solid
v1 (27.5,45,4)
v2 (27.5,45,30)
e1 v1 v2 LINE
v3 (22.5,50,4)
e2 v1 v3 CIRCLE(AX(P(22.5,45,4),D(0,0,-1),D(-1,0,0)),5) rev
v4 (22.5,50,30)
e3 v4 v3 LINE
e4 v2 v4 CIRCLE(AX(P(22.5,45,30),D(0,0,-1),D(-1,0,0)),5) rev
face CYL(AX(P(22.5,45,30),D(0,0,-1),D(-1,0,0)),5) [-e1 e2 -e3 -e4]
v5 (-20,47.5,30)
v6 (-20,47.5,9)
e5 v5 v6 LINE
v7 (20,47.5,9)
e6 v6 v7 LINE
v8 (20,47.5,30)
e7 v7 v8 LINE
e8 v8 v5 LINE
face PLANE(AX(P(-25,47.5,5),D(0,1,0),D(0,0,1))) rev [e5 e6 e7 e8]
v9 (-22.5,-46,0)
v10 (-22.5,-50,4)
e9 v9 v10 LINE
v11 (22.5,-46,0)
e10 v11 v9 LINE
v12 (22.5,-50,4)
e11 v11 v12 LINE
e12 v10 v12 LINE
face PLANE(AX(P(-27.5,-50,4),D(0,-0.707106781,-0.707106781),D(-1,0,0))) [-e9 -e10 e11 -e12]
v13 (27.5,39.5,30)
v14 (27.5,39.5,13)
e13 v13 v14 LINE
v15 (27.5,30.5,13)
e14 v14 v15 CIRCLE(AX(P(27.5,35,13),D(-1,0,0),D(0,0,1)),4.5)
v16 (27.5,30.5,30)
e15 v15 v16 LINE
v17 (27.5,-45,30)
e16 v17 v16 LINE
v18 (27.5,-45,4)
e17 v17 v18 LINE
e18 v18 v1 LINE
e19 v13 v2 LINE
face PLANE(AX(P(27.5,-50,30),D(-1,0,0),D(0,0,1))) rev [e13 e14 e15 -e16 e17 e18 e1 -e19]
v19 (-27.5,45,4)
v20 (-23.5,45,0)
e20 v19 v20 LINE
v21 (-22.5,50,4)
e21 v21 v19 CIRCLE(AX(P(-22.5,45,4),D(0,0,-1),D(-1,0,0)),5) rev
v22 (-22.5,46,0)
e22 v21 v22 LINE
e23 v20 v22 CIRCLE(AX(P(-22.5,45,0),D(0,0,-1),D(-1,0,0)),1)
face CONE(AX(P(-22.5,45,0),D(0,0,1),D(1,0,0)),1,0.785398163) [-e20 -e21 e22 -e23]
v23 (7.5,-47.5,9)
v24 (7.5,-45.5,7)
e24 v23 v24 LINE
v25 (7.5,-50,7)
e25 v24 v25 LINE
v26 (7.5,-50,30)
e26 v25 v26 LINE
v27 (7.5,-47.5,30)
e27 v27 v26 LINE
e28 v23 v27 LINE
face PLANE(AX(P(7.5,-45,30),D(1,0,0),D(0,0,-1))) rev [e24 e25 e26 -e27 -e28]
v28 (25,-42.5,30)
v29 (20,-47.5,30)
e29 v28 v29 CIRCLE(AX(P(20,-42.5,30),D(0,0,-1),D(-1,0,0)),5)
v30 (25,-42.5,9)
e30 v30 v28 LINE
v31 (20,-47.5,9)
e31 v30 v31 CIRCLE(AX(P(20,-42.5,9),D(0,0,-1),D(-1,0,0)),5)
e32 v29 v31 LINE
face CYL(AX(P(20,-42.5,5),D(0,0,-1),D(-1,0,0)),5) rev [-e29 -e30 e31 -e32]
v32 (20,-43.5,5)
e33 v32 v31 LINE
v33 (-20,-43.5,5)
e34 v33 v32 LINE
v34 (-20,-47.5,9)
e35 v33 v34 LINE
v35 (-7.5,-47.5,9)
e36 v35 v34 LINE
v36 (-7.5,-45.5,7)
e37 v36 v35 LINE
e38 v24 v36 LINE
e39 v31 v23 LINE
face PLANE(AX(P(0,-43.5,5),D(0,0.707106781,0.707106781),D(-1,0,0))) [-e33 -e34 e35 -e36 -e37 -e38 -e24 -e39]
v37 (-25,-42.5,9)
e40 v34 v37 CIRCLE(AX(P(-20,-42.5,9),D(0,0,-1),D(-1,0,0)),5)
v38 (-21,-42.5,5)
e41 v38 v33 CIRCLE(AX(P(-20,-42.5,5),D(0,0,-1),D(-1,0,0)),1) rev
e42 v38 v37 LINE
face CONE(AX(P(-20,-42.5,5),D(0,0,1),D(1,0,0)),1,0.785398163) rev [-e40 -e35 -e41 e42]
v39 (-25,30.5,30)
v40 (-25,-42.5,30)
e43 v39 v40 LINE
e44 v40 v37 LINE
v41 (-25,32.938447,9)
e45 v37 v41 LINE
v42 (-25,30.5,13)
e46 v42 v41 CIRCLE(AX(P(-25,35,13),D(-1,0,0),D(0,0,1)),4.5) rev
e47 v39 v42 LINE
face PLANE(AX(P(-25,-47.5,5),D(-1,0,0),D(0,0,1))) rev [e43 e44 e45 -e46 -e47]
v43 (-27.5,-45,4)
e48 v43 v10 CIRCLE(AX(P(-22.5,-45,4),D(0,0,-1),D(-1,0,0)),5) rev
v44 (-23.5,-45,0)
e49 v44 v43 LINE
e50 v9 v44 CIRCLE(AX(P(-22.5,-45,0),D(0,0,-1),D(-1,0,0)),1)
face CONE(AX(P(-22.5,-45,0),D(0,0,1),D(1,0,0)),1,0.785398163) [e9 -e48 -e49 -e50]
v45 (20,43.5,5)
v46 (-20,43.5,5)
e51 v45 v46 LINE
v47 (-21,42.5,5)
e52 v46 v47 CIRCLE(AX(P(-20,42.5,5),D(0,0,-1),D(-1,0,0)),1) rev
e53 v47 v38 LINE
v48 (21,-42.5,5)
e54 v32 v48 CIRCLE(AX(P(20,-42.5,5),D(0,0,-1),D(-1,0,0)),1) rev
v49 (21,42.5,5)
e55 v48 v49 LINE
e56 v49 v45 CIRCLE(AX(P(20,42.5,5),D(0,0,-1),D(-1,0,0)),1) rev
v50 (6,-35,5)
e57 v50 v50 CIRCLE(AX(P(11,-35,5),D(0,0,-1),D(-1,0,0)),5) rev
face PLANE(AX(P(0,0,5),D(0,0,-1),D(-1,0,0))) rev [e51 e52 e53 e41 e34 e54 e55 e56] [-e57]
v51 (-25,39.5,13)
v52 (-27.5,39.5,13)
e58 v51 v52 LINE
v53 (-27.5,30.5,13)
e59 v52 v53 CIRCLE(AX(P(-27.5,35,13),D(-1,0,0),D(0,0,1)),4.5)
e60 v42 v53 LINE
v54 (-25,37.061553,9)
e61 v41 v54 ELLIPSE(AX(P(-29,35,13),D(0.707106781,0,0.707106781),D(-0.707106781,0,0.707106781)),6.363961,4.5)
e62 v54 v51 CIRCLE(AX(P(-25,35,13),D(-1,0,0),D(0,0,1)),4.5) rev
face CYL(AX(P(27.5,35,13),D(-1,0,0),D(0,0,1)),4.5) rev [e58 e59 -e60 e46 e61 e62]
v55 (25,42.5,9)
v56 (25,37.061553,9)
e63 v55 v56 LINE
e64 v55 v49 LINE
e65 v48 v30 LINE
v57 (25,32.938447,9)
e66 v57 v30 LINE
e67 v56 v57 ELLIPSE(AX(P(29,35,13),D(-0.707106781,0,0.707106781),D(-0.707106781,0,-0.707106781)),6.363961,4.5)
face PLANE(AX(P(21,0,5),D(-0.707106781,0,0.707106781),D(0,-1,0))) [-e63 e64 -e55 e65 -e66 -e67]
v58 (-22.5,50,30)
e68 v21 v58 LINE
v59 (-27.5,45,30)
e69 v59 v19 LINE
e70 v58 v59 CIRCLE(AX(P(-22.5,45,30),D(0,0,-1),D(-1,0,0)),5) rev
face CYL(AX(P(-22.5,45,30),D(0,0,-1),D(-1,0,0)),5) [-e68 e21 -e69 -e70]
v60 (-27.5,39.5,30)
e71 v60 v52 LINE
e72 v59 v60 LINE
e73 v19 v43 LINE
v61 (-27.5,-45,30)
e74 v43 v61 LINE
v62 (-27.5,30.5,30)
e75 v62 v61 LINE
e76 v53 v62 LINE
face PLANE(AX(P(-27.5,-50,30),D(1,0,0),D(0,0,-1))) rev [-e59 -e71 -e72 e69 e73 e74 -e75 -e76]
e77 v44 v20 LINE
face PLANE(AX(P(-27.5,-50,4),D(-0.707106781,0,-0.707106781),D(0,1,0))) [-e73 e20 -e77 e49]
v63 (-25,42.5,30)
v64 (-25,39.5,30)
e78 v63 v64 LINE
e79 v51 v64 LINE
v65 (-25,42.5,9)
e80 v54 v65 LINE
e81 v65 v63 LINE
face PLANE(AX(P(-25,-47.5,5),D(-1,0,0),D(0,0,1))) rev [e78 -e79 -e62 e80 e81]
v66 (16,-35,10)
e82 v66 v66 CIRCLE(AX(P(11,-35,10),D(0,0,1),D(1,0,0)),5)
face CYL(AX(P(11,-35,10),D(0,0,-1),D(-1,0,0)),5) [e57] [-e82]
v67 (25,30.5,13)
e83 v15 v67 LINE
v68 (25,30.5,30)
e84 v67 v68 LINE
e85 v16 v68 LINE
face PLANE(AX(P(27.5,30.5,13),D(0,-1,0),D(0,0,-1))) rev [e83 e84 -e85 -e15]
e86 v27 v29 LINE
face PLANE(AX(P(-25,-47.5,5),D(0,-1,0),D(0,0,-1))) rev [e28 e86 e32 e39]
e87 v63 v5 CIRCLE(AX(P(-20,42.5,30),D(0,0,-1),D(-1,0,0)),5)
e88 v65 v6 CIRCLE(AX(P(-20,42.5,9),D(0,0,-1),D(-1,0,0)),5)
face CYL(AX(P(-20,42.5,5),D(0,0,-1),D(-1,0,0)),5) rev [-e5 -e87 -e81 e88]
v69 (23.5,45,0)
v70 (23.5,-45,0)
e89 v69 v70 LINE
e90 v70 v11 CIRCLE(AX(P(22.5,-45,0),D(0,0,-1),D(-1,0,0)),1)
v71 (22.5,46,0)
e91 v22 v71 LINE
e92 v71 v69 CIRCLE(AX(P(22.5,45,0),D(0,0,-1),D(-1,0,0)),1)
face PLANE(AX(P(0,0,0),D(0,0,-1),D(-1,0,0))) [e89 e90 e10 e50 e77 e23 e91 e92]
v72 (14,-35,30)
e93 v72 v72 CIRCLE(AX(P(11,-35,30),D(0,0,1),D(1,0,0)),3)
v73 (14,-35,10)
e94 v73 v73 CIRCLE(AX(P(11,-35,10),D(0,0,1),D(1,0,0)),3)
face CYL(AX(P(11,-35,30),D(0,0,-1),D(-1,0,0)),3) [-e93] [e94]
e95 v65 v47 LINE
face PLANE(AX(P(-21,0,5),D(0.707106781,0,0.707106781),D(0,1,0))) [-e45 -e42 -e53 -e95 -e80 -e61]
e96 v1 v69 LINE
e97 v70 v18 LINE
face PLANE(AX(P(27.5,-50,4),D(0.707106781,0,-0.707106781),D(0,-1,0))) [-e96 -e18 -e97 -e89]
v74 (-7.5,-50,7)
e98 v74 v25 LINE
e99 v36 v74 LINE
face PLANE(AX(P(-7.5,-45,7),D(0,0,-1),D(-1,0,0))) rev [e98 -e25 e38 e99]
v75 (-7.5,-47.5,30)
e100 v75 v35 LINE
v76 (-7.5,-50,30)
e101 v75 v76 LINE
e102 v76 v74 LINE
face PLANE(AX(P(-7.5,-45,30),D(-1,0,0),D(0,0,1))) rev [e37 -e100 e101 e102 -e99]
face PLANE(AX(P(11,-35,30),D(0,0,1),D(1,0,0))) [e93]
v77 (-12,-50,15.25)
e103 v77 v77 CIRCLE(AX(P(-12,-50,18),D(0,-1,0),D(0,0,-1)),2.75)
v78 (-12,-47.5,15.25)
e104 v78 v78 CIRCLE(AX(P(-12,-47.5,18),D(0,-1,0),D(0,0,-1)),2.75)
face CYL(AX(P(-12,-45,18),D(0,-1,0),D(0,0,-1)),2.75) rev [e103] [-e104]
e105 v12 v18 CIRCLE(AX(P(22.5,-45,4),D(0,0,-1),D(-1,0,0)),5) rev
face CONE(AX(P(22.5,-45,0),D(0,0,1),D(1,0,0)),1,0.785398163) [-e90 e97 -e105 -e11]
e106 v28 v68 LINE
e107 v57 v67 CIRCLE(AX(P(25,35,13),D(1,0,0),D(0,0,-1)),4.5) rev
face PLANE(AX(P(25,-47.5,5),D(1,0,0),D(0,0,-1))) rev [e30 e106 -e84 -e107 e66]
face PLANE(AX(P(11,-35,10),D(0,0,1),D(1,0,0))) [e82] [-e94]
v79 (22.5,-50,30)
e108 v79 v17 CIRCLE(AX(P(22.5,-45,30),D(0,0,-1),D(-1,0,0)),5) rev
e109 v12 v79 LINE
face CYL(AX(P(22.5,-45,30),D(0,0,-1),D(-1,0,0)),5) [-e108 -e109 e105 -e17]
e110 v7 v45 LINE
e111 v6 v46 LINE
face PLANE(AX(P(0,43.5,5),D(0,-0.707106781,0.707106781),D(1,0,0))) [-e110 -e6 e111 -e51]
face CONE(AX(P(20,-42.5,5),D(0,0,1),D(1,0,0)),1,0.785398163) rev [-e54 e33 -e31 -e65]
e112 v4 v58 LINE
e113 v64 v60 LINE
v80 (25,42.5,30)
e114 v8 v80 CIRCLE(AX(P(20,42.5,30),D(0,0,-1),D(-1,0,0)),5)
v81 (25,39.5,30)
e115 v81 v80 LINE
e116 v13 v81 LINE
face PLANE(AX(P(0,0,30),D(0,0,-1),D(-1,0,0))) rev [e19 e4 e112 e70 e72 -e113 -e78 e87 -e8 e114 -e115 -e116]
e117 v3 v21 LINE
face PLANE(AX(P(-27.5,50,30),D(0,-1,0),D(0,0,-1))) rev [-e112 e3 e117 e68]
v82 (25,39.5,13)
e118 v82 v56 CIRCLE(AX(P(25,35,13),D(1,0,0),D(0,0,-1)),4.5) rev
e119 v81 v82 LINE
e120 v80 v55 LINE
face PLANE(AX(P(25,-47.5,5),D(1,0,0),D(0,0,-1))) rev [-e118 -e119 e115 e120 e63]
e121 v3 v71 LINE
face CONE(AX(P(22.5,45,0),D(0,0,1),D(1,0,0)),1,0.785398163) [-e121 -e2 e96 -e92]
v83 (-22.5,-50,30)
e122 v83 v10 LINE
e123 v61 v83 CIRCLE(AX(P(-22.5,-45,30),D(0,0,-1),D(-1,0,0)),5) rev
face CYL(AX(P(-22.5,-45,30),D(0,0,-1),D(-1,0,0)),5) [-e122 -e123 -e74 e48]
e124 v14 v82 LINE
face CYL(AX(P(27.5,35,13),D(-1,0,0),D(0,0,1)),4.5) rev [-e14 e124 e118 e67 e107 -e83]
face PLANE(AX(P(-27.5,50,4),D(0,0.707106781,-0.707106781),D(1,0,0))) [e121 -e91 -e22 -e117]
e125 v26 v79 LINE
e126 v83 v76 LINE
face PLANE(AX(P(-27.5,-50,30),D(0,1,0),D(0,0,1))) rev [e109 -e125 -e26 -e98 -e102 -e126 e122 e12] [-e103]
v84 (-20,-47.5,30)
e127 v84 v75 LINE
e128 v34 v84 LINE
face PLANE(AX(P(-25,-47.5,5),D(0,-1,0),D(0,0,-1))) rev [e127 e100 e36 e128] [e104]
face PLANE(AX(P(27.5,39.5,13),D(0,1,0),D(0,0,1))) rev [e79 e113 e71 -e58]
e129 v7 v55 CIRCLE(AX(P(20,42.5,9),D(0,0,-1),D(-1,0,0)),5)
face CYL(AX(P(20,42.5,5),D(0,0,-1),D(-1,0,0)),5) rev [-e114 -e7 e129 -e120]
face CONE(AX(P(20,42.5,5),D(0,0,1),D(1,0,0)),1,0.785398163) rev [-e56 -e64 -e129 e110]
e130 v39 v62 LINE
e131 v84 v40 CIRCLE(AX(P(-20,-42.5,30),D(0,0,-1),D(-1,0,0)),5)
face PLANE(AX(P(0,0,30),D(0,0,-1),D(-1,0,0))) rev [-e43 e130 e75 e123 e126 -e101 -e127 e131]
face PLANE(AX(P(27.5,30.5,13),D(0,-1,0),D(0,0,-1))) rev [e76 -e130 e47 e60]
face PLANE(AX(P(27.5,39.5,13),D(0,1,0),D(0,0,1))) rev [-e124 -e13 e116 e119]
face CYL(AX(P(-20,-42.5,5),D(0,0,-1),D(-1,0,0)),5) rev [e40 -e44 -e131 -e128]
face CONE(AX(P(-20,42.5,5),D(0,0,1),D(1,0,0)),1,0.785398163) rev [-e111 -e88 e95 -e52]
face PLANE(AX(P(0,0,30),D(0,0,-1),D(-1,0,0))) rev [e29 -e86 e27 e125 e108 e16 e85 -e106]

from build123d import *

# Parameters (mm, degrees)
SKETCH_1_W          = 55
SKETCH_1_H          = 100
EXTRUDE_1_DEPTH     = 30
CUT_EXTRUDE_1_DEPTH = 81.156097709
SKETCH_3_W          = 50
SKETCH_3_H          = 95
CUT_EXTRUDE_2_DEPTH = 25
FILLET_1_R          = 5
SKETCH_5_R          = 3
EXTRUDE_2_DEPTH     = 25
SKETCH_6_W          = 15
SKETCH_6_H          = 23
CUT_EXTRUDE_4_DEPTH = 5
CHAMFER_1_SIZE      = 4
SKETCH_7_R          = 5
EXTRUDE_3_DEPTH     = 5
SKETCH_8_R          = 2.75
CUT_EXTRUDE_5_DEPTH = 5


with BuildPart() as part:
    # 草圖1 → 填料-伸長1 (new body)
    with BuildSketch(Plane.XY):
        Rectangle(SKETCH_1_W, SKETCH_1_H)
    extrude(amount=EXTRUDE_1_DEPTH)

    # 草圖2 → 除料-伸長1 (cut, through all)
    with BuildSketch(Plane.ZY.offset(27.5)):
        with BuildLine():
            Line((13, 39.5), (30, 39.5))
            Line((30, 39.5), (30, 30.5))
            Line((30, 30.5), (13, 30.5))
            ThreePointArc((13, 30.5), (8.5, 35), (13, 39.5))
        make_face()
    extrude(amount=-CUT_EXTRUDE_1_DEPTH, mode=Mode.SUBTRACT)

    # 草圖3 → 除料-伸長2 (cut)
    with BuildSketch(Plane.XY.offset(30)):
        Rectangle(SKETCH_3_W, SKETCH_3_H)
    extrude(amount=-CUT_EXTRUDE_2_DEPTH, mode=Mode.SUBTRACT)

    # 圓角1
    fillet_1_edges = [part.edges().sort_by_distance(p)[0] for p in [
        (25, 47.5, 17.5),
        (-25, -47.5, 17.5),
        (25, -47.5, 17.5),
        (-25, 47.5, 17.5),
        (27.5, -50, 15),
        (-27.5, -50, 15),
        (-27.5, 50, 15),
        (27.5, 50, 15),
    ]]
    fillet(fillet_1_edges, radius=FILLET_1_R)

    # 草圖5 → 填料-伸長2 (add)
    with BuildSketch(Plane.XY.offset(5)):
        with Locations(Location((11, -35, 0), (0, 0, 180))):
            Circle(SKETCH_5_R)
    extrude(amount=EXTRUDE_2_DEPTH)

    # 草圖6 → 除料-伸長4 (cut)
    with BuildSketch(Plane.XZ.offset(50)):
        with Locations((0, 18.5)):
            Rectangle(SKETCH_6_W, SKETCH_6_H)
    extrude(amount=-CUT_EXTRUDE_4_DEPTH, mode=Mode.SUBTRACT)

    # 導角1
    # the kernel refuses this chamfer: 4 mm, written as the material it adds along each edge
    with BuildSketch(Plane(origin=(-20, -42.5, 5), x_dir=(-1, 0, 0), z_dir=(0, 1, 0))) as chamfer_1_piece_1:
        Polygon((5, CHAMFER_1_SIZE), (5 - CHAMFER_1_SIZE, 0), (5, 0), align=None)
    revolve(axis=Axis((-20, -42.5, 5), (0, 0, 1)), revolution_arc=90)
    with BuildSketch(Plane(origin=(-25, 42.5, 5), x_dir=(-0.027495876610586487, 0, 0.9996219169112968), z_dir=(0, -1, 0))) as chamfer_1_piece_2_section:
        Polygon((CHAMFER_1_SIZE * 0.999621916911, -CHAMFER_1_SIZE * 0.0274958766106), (-CHAMFER_1_SIZE * 0.0274958766106, -CHAMFER_1_SIZE * 0.999621916911), (0, 0), align=None)
    chamfer_1_piece_2 = extrude(amount=85, mode=Mode.PRIVATE)
    chamfer_1_piece_2 = chamfer_1_piece_2 - Plane(origin=(-23.679821879, 35, 13), x_dir=(0, -1, 0), z_dir=(-1, 0, 0)) * Cylinder(4.5, 186, mode=Mode.PRIVATE)
    add(chamfer_1_piece_2)
    with BuildSketch(Plane(origin=(-20, 42.5, 5), x_dir=(-1, 0, 0), z_dir=(0, -1, 0))) as chamfer_1_piece_3:
        Polygon((5 - CHAMFER_1_SIZE, 0), (5, -CHAMFER_1_SIZE), (5, 0), align=None)
    revolve(axis=Axis((-20, 42.5, 5), (0, 0, -1)), revolution_arc=90)
    with BuildSketch(Plane(origin=(20, 47.5, 5), x_dir=(0, -0.9996219169112968, -0.027495876610586296), z_dir=(-1, 0, 0))) as chamfer_1_piece_4:
        Polygon((CHAMFER_1_SIZE * 0.999621916911, CHAMFER_1_SIZE * 0.0274958766106), (-CHAMFER_1_SIZE * 0.0274958766106, CHAMFER_1_SIZE * 0.999621916911), (0, 0), align=None)
    extrude(amount=40)
    with BuildSketch(Plane(origin=(20, 42.5, 5), x_dir=(1, 0, 0), z_dir=(0, -1, 0))) as chamfer_1_piece_5:
        Polygon((5 - CHAMFER_1_SIZE, 0), (5, CHAMFER_1_SIZE), (5, 0), align=None)
    revolve(axis=Axis((20, 42.5, 5), (0, 0, 1)), revolution_arc=90)
    with BuildSketch(Plane(origin=(25, -42.5, 5), x_dir=(0.027495876610586487, 0, 0.9996219169112968), z_dir=(0, 1, 0))) as chamfer_1_piece_6_section:
        Polygon((CHAMFER_1_SIZE * 0.999621916911, -CHAMFER_1_SIZE * 0.0274958766106), (-CHAMFER_1_SIZE * 0.0274958766106, -CHAMFER_1_SIZE * 0.999621916911), (0, 0), align=None)
    chamfer_1_piece_6 = extrude(amount=85, mode=Mode.PRIVATE)
    chamfer_1_piece_6 = chamfer_1_piece_6 - Plane(origin=(23.679821879, 35, 13), x_dir=(0, -1, 0), z_dir=(-1, 0, 0)) * Cylinder(4.5, 186, mode=Mode.PRIVATE)
    add(chamfer_1_piece_6)
    with BuildSketch(Plane(origin=(20, -42.5, 5), x_dir=(0, -1, 0), z_dir=(-1, 0, 0))) as chamfer_1_piece_7:
        Polygon((5, CHAMFER_1_SIZE), (5 - CHAMFER_1_SIZE, 0), (5, 0), align=None)
    revolve(axis=Axis((20, -42.5, 5), (0, 0, 1)), revolution_arc=90)
    with BuildSketch(Plane(origin=(-20, -47.5, 5), x_dir=(0, -0.027495876610585623, 0.9996219169112968), z_dir=(1, 0, 0))) as chamfer_1_piece_8_section:
        Polygon((CHAMFER_1_SIZE * 0.999621916911, -CHAMFER_1_SIZE * 0.0274958766106), (-CHAMFER_1_SIZE * 0.0274958766106, -CHAMFER_1_SIZE * 0.999621916911), (0, 0), align=None)
    chamfer_1_piece_8 = extrude(amount=40, mode=Mode.PRIVATE)
    chamfer_1_piece_8 = split(chamfer_1_piece_8, bisect_by=Plane(origin=(-13.75, -46.917717373, 7), z_dir=(0, 0, 1)), keep=Keep.TOP, mode=Mode.PRIVATE)
    chamfer_1_piece_8 = split(chamfer_1_piece_8, bisect_by=Plane(origin=(-7.5, -46.917717373, 7.727438446), z_dir=(-1, 0, 0)), keep=Keep.TOP, mode=Mode.PRIVATE)
    add(chamfer_1_piece_8)
    with BuildSketch(Plane(origin=(-20, -47.5, 5), x_dir=(0, -0.027495876610585623, 0.9996219169112968), z_dir=(1, 0, 0))) as chamfer_1_piece_9_section:
        Polygon((CHAMFER_1_SIZE * 0.999621916911, -CHAMFER_1_SIZE * 0.0274958766106), (-CHAMFER_1_SIZE * 0.0274958766106, -CHAMFER_1_SIZE * 0.999621916911), (0, 0), align=None)
    chamfer_1_piece_9 = extrude(amount=40, mode=Mode.PRIVATE)
    chamfer_1_piece_9 = split(chamfer_1_piece_9, bisect_by=Plane(origin=(-13.75, -45.926395663, 7), z_dir=(0, 0, -1)), keep=Keep.TOP, mode=Mode.PRIVATE)
    chamfer_1_piece_9 = split(chamfer_1_piece_9, bisect_by=Plane(origin=(-7.5, -45.926395663, 5.832937159), z_dir=(-1, 0, 0)), keep=Keep.TOP, mode=Mode.PRIVATE)
    add(chamfer_1_piece_9)
    with BuildSketch(Plane(origin=(-20, -47.5, 5), x_dir=(0, -0.027495876610585623, 0.9996219169112968), z_dir=(1, 0, 0))) as chamfer_1_piece_10_section:
        Polygon((CHAMFER_1_SIZE * 0.999621916911, -CHAMFER_1_SIZE * 0.0274958766106), (-CHAMFER_1_SIZE * 0.0274958766106, -CHAMFER_1_SIZE * 0.999621916911), (0, 0), align=None)
    chamfer_1_piece_10 = extrude(amount=40, mode=Mode.PRIVATE)
    chamfer_1_piece_10 = split(chamfer_1_piece_10, bisect_by=Plane(origin=(7.5, -45.926395663, 5.832937159), z_dir=(-1, 0, 0)), keep=Keep.TOP, mode=Mode.PRIVATE)
    chamfer_1_piece_10 = split(chamfer_1_piece_10, bisect_by=Plane(origin=(0, -45.926395663, 7), z_dir=(0, 0, -1)), keep=Keep.TOP, mode=Mode.PRIVATE)
    chamfer_1_piece_10 = split(chamfer_1_piece_10, bisect_by=Plane(origin=(-7.5, -45.926395663, 5.832937159), z_dir=(1, 0, 0)), keep=Keep.TOP, mode=Mode.PRIVATE)
    add(chamfer_1_piece_10)
    with BuildSketch(Plane(origin=(-20, -47.5, 5), x_dir=(0, -0.027495876610585623, 0.9996219169112968), z_dir=(1, 0, 0))) as chamfer_1_piece_11_section:
        Polygon((CHAMFER_1_SIZE * 0.999621916911, -CHAMFER_1_SIZE * 0.0274958766106), (-CHAMFER_1_SIZE * 0.0274958766106, -CHAMFER_1_SIZE * 0.999621916911), (0, 0), align=None)
    chamfer_1_piece_11 = extrude(amount=40, mode=Mode.PRIVATE)
    chamfer_1_piece_11 = split(chamfer_1_piece_11, bisect_by=Plane(origin=(7.5, -46.917717373, 7.727438446), z_dir=(1, 0, 0)), keep=Keep.TOP, mode=Mode.PRIVATE)
    chamfer_1_piece_11 = split(chamfer_1_piece_11, bisect_by=Plane(origin=(13.75, -46.917717373, 7), z_dir=(0, 0, 1)), keep=Keep.TOP, mode=Mode.PRIVATE)
    add(chamfer_1_piece_11)
    with BuildSketch(Plane(origin=(-20, -47.5, 5), x_dir=(0, -0.027495876610585623, 0.9996219169112968), z_dir=(1, 0, 0))) as chamfer_1_piece_12_section:
        Polygon((CHAMFER_1_SIZE * 0.999621916911, -CHAMFER_1_SIZE * 0.0274958766106), (-CHAMFER_1_SIZE * 0.0274958766106, -CHAMFER_1_SIZE * 0.999621916911), (0, 0), align=None)
    chamfer_1_piece_12 = extrude(amount=40, mode=Mode.PRIVATE)
    chamfer_1_piece_12 = split(chamfer_1_piece_12, bisect_by=Plane(origin=(7.5, -45.926395663, 5.832937159), z_dir=(1, 0, 0)), keep=Keep.TOP, mode=Mode.PRIVATE)
    chamfer_1_piece_12 = split(chamfer_1_piece_12, bisect_by=Plane(origin=(13.75, -45.926395663, 7), z_dir=(0, 0, -1)), keep=Keep.TOP, mode=Mode.PRIVATE)
    add(chamfer_1_piece_12)
    # the kernel refuses this chamfer: 4 mm, written as the material it takes off along each edge
    with BuildSketch(Plane(origin=(-27.5, 45, 0), x_dir=(-0.027495876610586494, 0, 0.9996219169112968), z_dir=(0, -1, 0)), Plane(origin=(27.5, -45, 0), x_dir=(0.027495876610586494, 0, 0.9996219169112968), z_dir=(0, 1, 0))) as chamfer_1_2_piece_1:
        Polygon((CHAMFER_1_SIZE * 0.999621916911, -CHAMFER_1_SIZE * 0.0274958766106), (-CHAMFER_1_SIZE * 0.0274958766106, -CHAMFER_1_SIZE * 0.999621916911), (0, 0), align=None)
    extrude(amount=90, mode=Mode.SUBTRACT)
    with BuildSketch(Plane(origin=(-22.5, -45, 0), x_dir=(0, -1, 0), z_dir=(1, 0, 0))) as chamfer_1_2_piece_2:
        Polygon((5, -CHAMFER_1_SIZE), (5 - CHAMFER_1_SIZE, 0), (5, 0), align=None)
    revolve(axis=Axis((-22.5, -45, 0), (0, 0, -1)), revolution_arc=90, mode=Mode.SUBTRACT)
    with BuildSketch(Plane(origin=(-22.5, 45, 0), x_dir=(-1, 0, 0), z_dir=(0, -1, 0))) as chamfer_1_2_piece_3:
        Polygon((5, -CHAMFER_1_SIZE), (5 - CHAMFER_1_SIZE, 0), (5, 0), align=None)
    revolve(axis=Axis((-22.5, 45, 0), (0, 0, -1)), revolution_arc=90, mode=Mode.SUBTRACT)
    with BuildSketch(Plane(origin=(-22.5, -50, 0), x_dir=(0, -0.02749587661058563, 0.9996219169112968), z_dir=(1, 0, 0)), Plane(origin=(22.5, 50, 0), x_dir=(0, 0.02749587661058563, 0.9996219169112968), z_dir=(-1, 0, 0))) as chamfer_1_2_piece_4:
        Polygon((CHAMFER_1_SIZE * 0.999621916911, -CHAMFER_1_SIZE * 0.0274958766106), (-CHAMFER_1_SIZE * 0.0274958766106, -CHAMFER_1_SIZE * 0.999621916911), (0, 0), align=None)
    extrude(amount=45, mode=Mode.SUBTRACT)
    with BuildSketch(Plane(origin=(22.5, -45, 0), x_dir=(0, -1, 0), z_dir=(-1, 0, 0))) as chamfer_1_2_piece_5:
        Polygon((5, CHAMFER_1_SIZE), (5 - CHAMFER_1_SIZE, 0), (5, 0), align=None)
    revolve(axis=Axis((22.5, -45, 0), (0, 0, 1)), revolution_arc=90, mode=Mode.SUBTRACT)
    with BuildSketch(Plane(origin=(22.5, 45, 0), x_dir=(1, 0, 0), z_dir=(0, -1, 0))) as chamfer_1_2_piece_6:
        Polygon((5, CHAMFER_1_SIZE), (5 - CHAMFER_1_SIZE, 0), (5, 0), align=None)
    revolve(axis=Axis((22.5, 45, 0), (0, 0, 1)), revolution_arc=90, mode=Mode.SUBTRACT)

    # 草圖7 → 填料-伸長3 (add)
    with BuildSketch(Plane.XY.offset(5)):
        with Locations(Location((11, -35, 0), (0, 0, 180))):
            Circle(SKETCH_7_R)
    extrude(amount=EXTRUDE_3_DEPTH)

    # 草圖8 → 除料-伸長5 (cut)
    with BuildSketch(Plane.XZ.offset(50)):
        with Locations(Location((-12, 18, 0), (0, 0, 270))):
            Circle(SKETCH_8_R)
    extrude(amount=-CUT_EXTRUDE_5_DEPTH, mode=Mode.SUBTRACT)


solid = part.part
